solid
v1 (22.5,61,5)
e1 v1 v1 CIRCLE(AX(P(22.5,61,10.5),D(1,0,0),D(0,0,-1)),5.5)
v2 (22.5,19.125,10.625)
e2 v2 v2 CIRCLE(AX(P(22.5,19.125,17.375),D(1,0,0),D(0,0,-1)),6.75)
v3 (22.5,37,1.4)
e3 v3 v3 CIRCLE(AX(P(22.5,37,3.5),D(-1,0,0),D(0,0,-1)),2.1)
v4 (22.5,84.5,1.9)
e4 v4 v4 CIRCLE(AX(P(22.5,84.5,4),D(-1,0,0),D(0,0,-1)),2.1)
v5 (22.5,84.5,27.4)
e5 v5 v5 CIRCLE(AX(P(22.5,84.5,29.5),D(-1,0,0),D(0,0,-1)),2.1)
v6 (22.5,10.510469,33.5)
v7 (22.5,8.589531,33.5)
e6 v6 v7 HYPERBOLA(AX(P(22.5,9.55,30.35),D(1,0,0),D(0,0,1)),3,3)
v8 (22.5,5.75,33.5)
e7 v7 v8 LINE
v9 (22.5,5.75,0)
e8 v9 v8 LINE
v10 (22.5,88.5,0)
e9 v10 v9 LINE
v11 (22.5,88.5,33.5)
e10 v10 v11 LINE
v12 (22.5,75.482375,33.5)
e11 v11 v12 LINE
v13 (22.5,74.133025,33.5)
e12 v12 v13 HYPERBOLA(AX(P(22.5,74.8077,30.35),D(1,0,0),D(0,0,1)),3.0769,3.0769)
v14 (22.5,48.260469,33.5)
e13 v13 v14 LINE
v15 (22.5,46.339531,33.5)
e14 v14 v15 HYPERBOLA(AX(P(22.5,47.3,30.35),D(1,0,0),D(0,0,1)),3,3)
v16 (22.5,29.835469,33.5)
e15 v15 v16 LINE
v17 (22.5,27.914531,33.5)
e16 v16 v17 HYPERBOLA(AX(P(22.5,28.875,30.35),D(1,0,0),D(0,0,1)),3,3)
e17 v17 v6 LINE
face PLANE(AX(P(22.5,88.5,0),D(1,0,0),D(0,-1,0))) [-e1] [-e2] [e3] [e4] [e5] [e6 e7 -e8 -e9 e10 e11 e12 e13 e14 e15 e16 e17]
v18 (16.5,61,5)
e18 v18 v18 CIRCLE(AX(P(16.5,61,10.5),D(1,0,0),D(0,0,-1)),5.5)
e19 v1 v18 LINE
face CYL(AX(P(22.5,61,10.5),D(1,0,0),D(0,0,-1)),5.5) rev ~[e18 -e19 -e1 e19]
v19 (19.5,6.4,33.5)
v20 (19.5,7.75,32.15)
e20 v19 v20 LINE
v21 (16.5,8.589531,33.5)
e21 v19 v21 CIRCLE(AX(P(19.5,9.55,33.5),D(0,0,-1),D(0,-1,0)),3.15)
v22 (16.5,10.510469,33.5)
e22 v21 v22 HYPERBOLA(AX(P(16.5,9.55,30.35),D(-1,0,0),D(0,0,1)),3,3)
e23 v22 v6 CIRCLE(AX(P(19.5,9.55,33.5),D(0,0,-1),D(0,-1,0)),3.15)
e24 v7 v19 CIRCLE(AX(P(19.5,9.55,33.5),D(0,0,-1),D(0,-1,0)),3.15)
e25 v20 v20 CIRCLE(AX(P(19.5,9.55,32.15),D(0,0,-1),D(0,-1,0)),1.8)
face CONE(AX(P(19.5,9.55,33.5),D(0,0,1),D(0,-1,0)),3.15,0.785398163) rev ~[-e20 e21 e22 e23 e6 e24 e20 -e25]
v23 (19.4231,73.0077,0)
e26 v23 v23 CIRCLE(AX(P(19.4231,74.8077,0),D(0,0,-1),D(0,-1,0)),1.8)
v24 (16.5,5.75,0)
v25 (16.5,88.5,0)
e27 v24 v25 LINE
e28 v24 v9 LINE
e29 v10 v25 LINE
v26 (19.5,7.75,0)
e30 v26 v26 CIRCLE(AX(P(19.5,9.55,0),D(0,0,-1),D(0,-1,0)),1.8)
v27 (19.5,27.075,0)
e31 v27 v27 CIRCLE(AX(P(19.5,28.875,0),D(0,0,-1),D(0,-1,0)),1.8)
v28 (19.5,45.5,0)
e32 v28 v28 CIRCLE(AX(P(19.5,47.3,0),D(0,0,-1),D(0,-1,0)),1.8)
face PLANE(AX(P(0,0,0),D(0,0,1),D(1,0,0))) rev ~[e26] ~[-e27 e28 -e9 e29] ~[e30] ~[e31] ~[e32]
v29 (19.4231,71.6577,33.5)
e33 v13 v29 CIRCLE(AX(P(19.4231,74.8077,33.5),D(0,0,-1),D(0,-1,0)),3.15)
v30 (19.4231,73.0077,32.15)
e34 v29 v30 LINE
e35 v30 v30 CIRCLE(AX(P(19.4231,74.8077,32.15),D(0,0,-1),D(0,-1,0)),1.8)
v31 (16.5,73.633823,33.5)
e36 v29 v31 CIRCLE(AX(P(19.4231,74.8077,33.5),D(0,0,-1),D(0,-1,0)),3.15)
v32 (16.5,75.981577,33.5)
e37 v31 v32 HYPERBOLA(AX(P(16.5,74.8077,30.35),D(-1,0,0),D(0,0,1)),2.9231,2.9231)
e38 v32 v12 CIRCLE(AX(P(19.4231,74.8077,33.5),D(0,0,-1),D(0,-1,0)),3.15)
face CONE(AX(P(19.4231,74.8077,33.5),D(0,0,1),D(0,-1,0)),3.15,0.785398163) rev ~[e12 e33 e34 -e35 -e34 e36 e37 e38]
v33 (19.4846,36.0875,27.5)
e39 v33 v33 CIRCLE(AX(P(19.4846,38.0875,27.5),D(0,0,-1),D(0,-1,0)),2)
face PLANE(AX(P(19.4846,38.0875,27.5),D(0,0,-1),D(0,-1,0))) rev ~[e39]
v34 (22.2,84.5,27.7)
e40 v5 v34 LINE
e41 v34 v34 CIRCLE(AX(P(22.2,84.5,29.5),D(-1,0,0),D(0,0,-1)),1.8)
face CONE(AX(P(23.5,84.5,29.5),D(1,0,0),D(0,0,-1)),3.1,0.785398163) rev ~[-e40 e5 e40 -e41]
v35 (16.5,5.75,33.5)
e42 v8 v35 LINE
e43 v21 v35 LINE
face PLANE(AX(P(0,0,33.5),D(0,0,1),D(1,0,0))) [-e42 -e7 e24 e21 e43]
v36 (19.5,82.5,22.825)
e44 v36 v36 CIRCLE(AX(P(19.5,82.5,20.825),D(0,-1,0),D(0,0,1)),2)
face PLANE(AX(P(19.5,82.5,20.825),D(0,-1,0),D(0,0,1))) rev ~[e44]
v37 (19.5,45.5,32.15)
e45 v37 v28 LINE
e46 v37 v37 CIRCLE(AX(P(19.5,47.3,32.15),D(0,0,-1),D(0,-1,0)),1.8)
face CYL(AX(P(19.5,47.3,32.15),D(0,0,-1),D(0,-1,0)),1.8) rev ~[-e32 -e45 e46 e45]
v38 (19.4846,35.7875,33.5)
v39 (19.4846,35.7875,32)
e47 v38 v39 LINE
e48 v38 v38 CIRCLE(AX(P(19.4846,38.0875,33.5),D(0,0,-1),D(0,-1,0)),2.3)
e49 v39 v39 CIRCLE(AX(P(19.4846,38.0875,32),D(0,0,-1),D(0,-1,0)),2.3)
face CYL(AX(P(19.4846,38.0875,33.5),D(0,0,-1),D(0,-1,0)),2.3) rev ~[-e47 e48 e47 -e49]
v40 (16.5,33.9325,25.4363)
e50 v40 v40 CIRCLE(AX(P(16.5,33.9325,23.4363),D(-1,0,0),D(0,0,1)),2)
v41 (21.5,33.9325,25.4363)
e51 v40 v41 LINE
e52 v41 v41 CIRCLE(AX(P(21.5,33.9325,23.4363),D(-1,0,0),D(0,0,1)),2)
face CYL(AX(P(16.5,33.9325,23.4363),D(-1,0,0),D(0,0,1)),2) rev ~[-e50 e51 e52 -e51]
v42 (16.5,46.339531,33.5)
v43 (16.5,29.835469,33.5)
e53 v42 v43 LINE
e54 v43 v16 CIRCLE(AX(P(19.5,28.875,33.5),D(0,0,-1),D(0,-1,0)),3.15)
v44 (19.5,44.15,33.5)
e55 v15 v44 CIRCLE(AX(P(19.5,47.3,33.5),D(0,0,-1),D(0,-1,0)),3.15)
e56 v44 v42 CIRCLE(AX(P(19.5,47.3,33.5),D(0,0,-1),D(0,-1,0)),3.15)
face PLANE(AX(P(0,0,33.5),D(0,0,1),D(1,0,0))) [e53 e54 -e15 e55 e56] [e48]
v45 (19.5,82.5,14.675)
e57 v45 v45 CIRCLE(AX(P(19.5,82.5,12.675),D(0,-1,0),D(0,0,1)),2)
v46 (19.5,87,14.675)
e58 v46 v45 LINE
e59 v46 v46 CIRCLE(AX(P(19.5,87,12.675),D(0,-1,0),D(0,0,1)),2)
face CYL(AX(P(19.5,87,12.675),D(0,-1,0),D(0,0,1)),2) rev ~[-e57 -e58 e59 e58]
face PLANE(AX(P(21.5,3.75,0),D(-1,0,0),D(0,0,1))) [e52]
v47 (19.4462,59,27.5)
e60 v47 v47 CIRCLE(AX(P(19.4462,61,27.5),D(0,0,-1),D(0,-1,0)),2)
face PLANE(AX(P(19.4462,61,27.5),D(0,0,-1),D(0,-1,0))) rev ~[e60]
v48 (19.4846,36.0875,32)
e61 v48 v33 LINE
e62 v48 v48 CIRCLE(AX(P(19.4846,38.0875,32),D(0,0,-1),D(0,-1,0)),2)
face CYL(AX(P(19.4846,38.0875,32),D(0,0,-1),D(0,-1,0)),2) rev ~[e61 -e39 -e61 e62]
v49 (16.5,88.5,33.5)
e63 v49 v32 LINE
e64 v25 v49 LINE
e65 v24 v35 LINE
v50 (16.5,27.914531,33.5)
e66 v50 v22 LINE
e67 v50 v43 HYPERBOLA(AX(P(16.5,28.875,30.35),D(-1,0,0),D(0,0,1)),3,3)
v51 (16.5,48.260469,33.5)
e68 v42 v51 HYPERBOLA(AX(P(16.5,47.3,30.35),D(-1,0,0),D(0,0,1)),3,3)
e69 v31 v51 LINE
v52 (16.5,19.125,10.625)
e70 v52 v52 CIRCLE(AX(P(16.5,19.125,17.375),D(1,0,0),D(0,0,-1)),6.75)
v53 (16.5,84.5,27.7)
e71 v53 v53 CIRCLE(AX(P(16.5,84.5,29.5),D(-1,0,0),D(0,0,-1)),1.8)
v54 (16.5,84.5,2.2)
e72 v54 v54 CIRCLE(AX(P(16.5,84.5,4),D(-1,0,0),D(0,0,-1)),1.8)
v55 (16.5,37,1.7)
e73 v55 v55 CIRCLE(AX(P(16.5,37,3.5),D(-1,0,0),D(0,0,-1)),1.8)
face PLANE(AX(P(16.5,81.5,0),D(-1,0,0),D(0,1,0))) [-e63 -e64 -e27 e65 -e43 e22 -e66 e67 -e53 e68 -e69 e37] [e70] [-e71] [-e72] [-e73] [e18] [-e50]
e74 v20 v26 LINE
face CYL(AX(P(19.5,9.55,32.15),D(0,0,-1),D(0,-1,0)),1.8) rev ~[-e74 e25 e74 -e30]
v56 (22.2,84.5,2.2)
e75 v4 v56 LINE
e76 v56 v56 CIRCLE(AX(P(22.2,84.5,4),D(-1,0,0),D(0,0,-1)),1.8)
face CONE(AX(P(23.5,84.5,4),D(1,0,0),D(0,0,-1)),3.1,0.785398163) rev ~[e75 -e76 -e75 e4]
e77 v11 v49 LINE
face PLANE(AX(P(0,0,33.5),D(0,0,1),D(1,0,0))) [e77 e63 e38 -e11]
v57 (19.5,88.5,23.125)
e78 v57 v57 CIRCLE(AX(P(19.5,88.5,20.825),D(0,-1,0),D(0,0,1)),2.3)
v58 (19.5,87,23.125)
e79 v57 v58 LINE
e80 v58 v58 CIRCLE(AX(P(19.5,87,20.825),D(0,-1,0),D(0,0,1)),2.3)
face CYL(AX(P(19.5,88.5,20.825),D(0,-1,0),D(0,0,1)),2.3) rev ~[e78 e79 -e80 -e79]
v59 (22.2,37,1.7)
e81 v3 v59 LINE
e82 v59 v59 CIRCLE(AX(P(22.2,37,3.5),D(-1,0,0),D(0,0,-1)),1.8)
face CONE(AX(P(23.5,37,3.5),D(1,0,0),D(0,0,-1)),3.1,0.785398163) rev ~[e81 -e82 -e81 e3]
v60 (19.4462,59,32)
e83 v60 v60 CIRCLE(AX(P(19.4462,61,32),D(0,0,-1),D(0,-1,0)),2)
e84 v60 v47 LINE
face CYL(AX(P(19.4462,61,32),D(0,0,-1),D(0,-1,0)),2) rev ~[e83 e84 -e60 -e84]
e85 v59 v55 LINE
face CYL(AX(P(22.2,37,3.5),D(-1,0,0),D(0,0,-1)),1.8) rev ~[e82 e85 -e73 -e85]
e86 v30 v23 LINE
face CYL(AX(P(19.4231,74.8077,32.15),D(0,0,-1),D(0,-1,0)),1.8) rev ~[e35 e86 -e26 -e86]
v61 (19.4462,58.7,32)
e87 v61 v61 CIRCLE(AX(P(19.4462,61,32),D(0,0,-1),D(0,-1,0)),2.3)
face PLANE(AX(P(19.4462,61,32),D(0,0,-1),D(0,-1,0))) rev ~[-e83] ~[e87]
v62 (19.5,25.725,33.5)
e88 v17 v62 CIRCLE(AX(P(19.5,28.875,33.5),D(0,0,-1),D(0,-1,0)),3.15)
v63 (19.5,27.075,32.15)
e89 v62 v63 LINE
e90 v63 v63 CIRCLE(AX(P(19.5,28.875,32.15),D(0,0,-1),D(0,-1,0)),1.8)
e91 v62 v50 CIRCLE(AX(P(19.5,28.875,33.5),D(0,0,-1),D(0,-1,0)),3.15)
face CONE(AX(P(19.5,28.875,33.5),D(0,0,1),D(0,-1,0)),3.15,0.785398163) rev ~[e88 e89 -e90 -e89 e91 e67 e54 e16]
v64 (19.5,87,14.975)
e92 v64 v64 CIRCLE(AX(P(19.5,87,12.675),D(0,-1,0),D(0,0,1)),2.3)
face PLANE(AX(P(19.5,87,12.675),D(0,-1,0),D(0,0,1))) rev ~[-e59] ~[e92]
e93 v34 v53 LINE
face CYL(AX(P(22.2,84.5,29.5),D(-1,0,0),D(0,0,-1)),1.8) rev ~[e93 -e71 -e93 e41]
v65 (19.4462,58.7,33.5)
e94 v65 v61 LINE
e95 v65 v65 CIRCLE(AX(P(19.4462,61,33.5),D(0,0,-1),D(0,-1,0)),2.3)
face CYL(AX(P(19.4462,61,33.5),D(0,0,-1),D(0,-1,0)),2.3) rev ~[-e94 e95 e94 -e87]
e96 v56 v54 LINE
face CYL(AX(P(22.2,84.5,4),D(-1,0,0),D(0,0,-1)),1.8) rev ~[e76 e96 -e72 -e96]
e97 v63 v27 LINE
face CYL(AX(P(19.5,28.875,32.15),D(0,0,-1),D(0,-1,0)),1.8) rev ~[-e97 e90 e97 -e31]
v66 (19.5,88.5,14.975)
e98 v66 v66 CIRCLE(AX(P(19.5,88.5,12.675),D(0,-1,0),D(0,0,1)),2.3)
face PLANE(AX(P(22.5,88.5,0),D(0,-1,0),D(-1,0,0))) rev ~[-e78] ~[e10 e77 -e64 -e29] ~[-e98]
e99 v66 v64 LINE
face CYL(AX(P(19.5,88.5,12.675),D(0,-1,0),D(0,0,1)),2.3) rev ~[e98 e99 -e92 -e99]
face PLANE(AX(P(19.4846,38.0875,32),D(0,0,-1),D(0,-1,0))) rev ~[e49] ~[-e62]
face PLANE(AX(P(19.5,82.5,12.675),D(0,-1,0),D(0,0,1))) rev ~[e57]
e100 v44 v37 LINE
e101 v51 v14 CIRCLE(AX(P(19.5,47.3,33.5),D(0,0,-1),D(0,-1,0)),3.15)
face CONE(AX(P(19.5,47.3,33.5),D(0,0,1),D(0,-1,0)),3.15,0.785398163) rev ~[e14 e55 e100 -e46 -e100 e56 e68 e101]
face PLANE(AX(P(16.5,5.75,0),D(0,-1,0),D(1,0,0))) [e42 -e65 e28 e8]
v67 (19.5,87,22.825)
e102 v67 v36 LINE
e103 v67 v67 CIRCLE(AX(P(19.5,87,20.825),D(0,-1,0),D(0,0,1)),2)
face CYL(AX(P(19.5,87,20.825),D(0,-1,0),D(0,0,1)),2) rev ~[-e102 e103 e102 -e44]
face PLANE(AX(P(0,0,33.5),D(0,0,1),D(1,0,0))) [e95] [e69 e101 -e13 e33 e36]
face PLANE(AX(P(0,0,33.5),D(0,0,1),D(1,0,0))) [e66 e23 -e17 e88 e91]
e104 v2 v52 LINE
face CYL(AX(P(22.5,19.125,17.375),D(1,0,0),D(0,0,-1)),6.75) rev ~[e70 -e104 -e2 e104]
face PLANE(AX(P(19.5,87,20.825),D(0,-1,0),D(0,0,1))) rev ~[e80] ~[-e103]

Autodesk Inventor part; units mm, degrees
ref_plane "YZ Plane" through (0, 0, 0) normal (1, 0, 0) x (0, 1, 0)
ref_plane "XZ Plane" through (0, 0, 0) normal (0, 1, 0) x (-1, 0, 0)
ref_plane "Work Plane1" through (0, 0, 0) normal (0, 0, 1) x (1, 0, 0)
sketch "Sketch1" plane through (0, 0, 0) normal (0, 0, 1) x (1, 0, 0)
  line L0 (23.5, 88.5) -> (-23.5, 88.5) projected
  line L1 (-23.5, 88.5) -> (-23.5, 36.5) projected
  line L2 (-26.5, 33.5) -> (-89, 33.5) projected
  line L3 (-89, 33.5) -> (-89, -72.5) projected
  line L4 (-89, -72.5) -> (-77, -72.5) projected
  line L5 (-74, -75.5) -> (-74, -93.5) projected
  line L6 (-74, -93.5) -> (74, -93.5) projected
  line L7 (74, -93.5) -> (74, -75.5) projected
  line L8 (77, -72.5) -> (89, -72.5) projected
  line L9 (89, -72.5) -> (89, 33.5) projected
  line L10 (89, 33.5) -> (26.5, 33.5) projected
  line L11 (23.5, 36.5) -> (23.5, 88.5) projected
  line L12 (-4.5, 81.5) -> (-4.5, 36.5) projected
  line L13 (-7.5, 33.5) -> (-13.5, 33.5) projected
  line L14 (-16.5, 36.5) -> (-16.5, 81.5) projected
  line L15 (7.5, 84.5) -> (13.5, 84.5) projected
  line L16 (16.5, 81.5) -> (16.5, 36.5) projected
  line L17 (13.5, 33.5) -> (7.5, 33.5) projected
  line L18 (4.5, 36.5) -> (4.5, 81.5) projected
  line L19 (-13.5, 84.5) -> (-7.5, 84.5) projected
  line L20 (16.5, 88.5) -> (22.5, 88.5)
  line L21 (22.5, 88.5) -> (22.5, 3.75)
  line L22 (22.5, 3.75) -> (16.5, 3.75)
  line L23 (16.5, 3.75) -> (16.5, 88.5)
  line L24 (59.9, 4.75) -> (32.2, 4.75)
  arc A0 (13.5, 33.5) -> (16.5, 36.5) centre (13.5, 36.5) ccw projected
  arc A1 (4.5, 36.5) -> (7.5, 33.5) centre (7.5, 36.5) ccw projected
  arc A2 (7.5, 84.5) -> (4.5, 81.5) centre (7.5, 81.5) ccw projected
  arc A3 (16.5, 81.5) -> (13.5, 84.5) centre (13.5, 81.5) ccw projected
  arc A4 (-4.5, 81.5) -> (-7.5, 84.5) centre (-7.5, 81.5) ccw projected
  arc A5 (-7.5, 33.5) -> (-4.5, 36.5) centre (-7.5, 36.5) ccw projected
  arc A6 (-16.5, 36.5) -> (-13.5, 33.5) centre (-13.5, 36.5) ccw projected
  arc A7 (-13.5, 84.5) -> (-16.5, 81.5) centre (-13.5, 81.5) ccw projected
  arc A8 (-26.5, 33.5) -> (-23.5, 36.5) centre (-26.5, 36.5) ccw projected
  arc A9 (-74, -75.5) -> (-77, -72.5) centre (-77, -75.5) ccw projected
  arc A10 (77, -72.5) -> (74, -75.5) centre (77, -75.5) ccw projected
  arc A11 (23.5, 36.5) -> (26.5, 33.5) centre (26.5, 36.5) ccw projected
  circle A12 centre (21.5, -85.5) radius 1.8 projected
  circle A13 centre (-64.5, -85.5) radius 1.8 projected
  circle A14 centre (83.4, -16.3889) radius 1.8 projected
  circle A15 centre (-83.4, -19.2889) radius 1.8 projected
  circle A16 centre (-21.5, -85.5) radius 1.8 projected
  circle A17 centre (64.5, -85.5) radius 1.8 projected
  circle A18 centre (39.125, 25.9125) radius 1.0065 projected
  circle A19 centre (72.95, 12.275) radius 1.0065 projected
  circle A20 centre (86, 30.5) radius 1.0065 projected
  circle A21 centre (-86, 30.5) radius 1.0065 projected
  circle A22 centre (-39.125, 12.3375) radius 1.0065 projected
  circle A23 centre (-72.95, 25.975) radius 1.0065 projected
  circle A24 centre (-72.95, 12.275) radius 1.0065 projected
  circle A25 centre (-39.125, 25.9125) radius 1.0065 projected
  circle A26 centre (-86, 7.75) radius 1.0065 projected
  circle A27 centre (86, 7.75) radius 1.0065 projected
  circle A28 centre (72.95, 25.975) radius 1.0065 projected
  circle A29 centre (39.125, 12.3375) radius 1.0065 projected
  circle A30 centre (78, -67.1725) radius 1.2295 projected
  circle A31 centre (-24.1, -73.1) radius 1.2295 projected
  circle A32 centre (-42.4984, -44.6666) radius 1.2295 projected
  circle A33 centre (-79, -42.3889) radius 1.2295 projected
  circle A34 centre (-19.5, 28.875) radius 1.2295 projected
  circle A35 centre (19.5, 9.55) radius 1.2295 projected
  circle A36 centre (19.5, 47.3) radius 1.2295 projected
  circle A37 centre (-19.5, 47.3) radius 1.2295 projected
  circle A38 centre (0, 74.7) radius 1.2295 projected
  circle A39 centre (-19.4231, 74.8077) radius 1.2295 projected
  circle A40 centre (19.5, 74.7) radius 1.2295 projected
  circle A41 centre (0, 49.05) radius 1.2295 projected
  circle A42 centre (19.5, 28.875) radius 1.2295 projected
  circle A43 centre (0, 19.125) radius 1.2295 projected
  circle A44 centre (-19.5, 9.55) radius 1.2295 projected
  circle A45 centre (-78, -67.1725) radius 1.2295 projected
  circle A46 centre (24.1, -73.1) radius 1.2295 projected
  circle A47 centre (42.5, -44.6649) radius 1.2295 projected
  circle A48 centre (79, -42.3889) radius 1.2295 projected
  circle A49 centre (24.1, -24.9) radius 1.2295 projected
  circle A50 centre (-24.1, -24.9) radius 1.2295 projected
  point P0 (0, 0)
  point P1 (7.5, 81.5)
  point P2 (13.5, 81.5)
  point P3 (-7.5, 81.5)
  point P4 (-13.5, 81.5)
  dimension "d0" = 1
  dimension "d1" = 1
ref_plane "Work Plane2" through (-89, -40.3889, 33.5) normal (0, 0, 1) x (1, 0, 0)
extrude "Extrusion1" add sketch "Sketch1" along normal up to surface (33.5 mm away) contours L21 L22 L23 L16 L0 | A35 | A36 | A40 | A42
sketch "Sketch2" plane through (22.5, 3.75, 0) normal (1, 0, 0) x (0, 0, -1)
  circle A0 centre (-17.375, 15.375) radius 6.75 projected
  circle A1 centre (-10.5, 57.25) radius 5.5 projected
  point P0 (0, -3.75)
  dimension "d8" = 11
extrude "Extrusion2" cut sketch "Sketch2" against normal up to next
sketch "Sketch3" plane through (16.5, 3.75, 0) normal (-1, 0, 0) x (0, 0, 1)
  circle A0 centre (23.4363, 30.1825) radius 2 projected
  point P0 (0, -3.75)
extrude "Extrusion3" cut sketch "Sketch3" against normal blind 5
ref_plane "Work Plane3" through (23.5, 3.75, 0) normal (1, 0, 0) x (0, 0, -1)
sketch "Sketch4" plane through (23.5, 3.75, 0) normal (1, 0, 0) x (0, 0, -1)
  circle A0 centre (-29.5, 80.75) radius 1.8 projected
  circle A1 centre (-3.5, 33.25) radius 1.8 projected
  circle A2 centre (-4, 80.75) radius 1.8 projected
  point P0 (0, -3.75)
hole "Hole1" at (23.5, 37, 3.5) at (23.5, 84.5, 4) at (23.5, 84.5, 29.5) direction (-1, 0, 0) diameter 3.6 end through all countersink diameter 6.2 countersink angle 90 clearance for "Countersunk Flat Head Screw ISO 2009/7046" size "M3" standard "ISO"
sketch "Sketch5" plane through (16.5, 3.75, 33.5) normal (0, 0, 1) x (1, 0, 0)
  circle A0 centre (-36, 5.8) radius 1.8 projected
  circle A1 centre (-36, 25.125) radius 1.8 projected
  circle A2 centre (-36, 43.55) radius 1.8 projected
  circle A3 centre (-35.9231, 71.0577) radius 1.8 projected
  circle A4 centre (-16.5, 45.3) radius 3.3 projected
  circle A5 centre (-16.5, 15.375) radius 3.3 projected
  circle A6 centre (-16.5, 70.95) radius 3.3 projected
  line L0 (-12, 2) -> (-21, 2) projected
  line L1 (-12, 84.75) -> (-12, 2) projected
  line L2 (-21, 84.75) -> (-12, 84.75) projected
  line L3 (-21, 2) -> (-21, 84.75) projected
  line L4 (-16.5, 2) -> (-16.5, 84.75)
  circle A7 centre (3, 5.8) radius 1.8
  circle A8 centre (3, 25.125) radius 1.8
  circle A9 centre (3, 43.55) radius 1.8
  circle A10 centre (2.9231, 71.0577) radius 1.8
  circle A11 centre (-16.5, 30.7161) radius 2.3 projected
  circle A12 centre (-16.5, 59.25) radius 2.3 projected
  point P0 (-16.5, -3.75)
hole "Hole2" at (19.5, 9.55, 33.5) at (19.5, 28.875, 33.5) at (19.5, 47.3, 33.5) at (19.4231, 74.8077, 33.5) direction (0, 0, -1) diameter 3.6 end through all countersink diameter 6.3 countersink angle 90 clearance for "Countersunk Flat Head Screw ISO 2009/7046" size "M3" standard "ISO"
sketch "Sketch7" plane through (16.5, 88.5, 0) normal (0, 1, 0) x (1, 0, 0)
  line L0 (0, -33.5) -> (6, -33.5) projected
  line L1 (6, 0) -> (6, -33.5) projected
  line L2 (6, 0) -> (0, 0) projected
  line L3 (0, 0) -> (0, -33.5) projected
  circle A0 centre (-16.5, -12.675) radius 2 projected
  circle A1 centre (-16.5, -20.825) radius 2 projected
  line L4 (-16.5, -20.825) -> (6, -20.825)
  line L5 (-16.5, -12.675) -> (6, -12.675)
  line L6 (6, -5) -> (6, -16) projected
  point P0 (-16.5, 0)
  point P1 (3, -20.825)
  point P2 (3, -12.675)
hole "Hole4" at (19.5, 88.5, 20.825) at (19.5, 88.5, 12.675) direction (0, -1, 0) diameter 4 depth 6 counterbore diameter 4.6 counterbore depth 1.5
sketch "Sketch8" plane through (19.5, 47.3, 33.5) normal (0, 0, 1) x (1, 0, 0)
  circle A0 centre (-39, -9.2125) radius 2.3 projected
  circle A1 centre (-39, 13.7) radius 2.3 projected
  arc A2 (3, 0.9605) -> (-3, 0.9605) centre (0, 0) ccw projected
  line L0 (3, 26.8331) -> (3, 0.9605) projected
  arc A3 (-3, 26.3338) -> (3, 26.8331) centre (-0.0769, 27.5077) ccw projected
  line L1 (-3, 0.9605) -> (-3, 26.3338) projected
  arc A4 (-3, -0.9605) -> (3, -0.9605) centre (0, 0) ccw projected
  line L2 (-3, -17.4645) -> (-3, -0.9605) projected
  arc A5 (3, -17.4645) -> (-3, -17.4645) centre (0, -18.425) ccw projected
  line L3 (3, -0.9605) -> (3, -17.4645) projected
  line L4 (-39, 13.7) -> (3, 13.7)
  line L5 (3, 19.2) -> (3, 8.2) projected
  line L6 (-39, -9.2125) -> (3, -9.2125)
  circle A6 centre (0, -18.425) radius 1.8 projected
  line L7 (0, -18.425) -> (-0.0769, 27.5077)
  point P0 (-19.5, -47.3)
  point P1 (-0.0538, 13.7)
  point P2 (-0.0154, -9.2125)
hole "Hole5" at (19.4462, 61, 33.5) at (19.4846, 38.0875, 33.5) direction (0, 0, -1) diameter 4 depth 6 counterbore diameter 4.6 counterbore depth 1.5
sketch "Sketch9" plane through (16.5, 3.75, 0) normal (0, -1, 0) x (1, 0, 0)
  line L0 (0, 0) -> (0, 33.5) projected
  line L1 (0, 0) -> (6, 0) projected
  line L2 (6, 0) -> (6, 33.5) projected
  line L3 (6, 33.5) -> (0, 33.5) projected
  point P0 (-16.5, 0)
extrude "Extrusion4" cut sketch "Sketch9" against normal blind 2
properties part number "left_gear_holder" material "Nylon 6/6"
